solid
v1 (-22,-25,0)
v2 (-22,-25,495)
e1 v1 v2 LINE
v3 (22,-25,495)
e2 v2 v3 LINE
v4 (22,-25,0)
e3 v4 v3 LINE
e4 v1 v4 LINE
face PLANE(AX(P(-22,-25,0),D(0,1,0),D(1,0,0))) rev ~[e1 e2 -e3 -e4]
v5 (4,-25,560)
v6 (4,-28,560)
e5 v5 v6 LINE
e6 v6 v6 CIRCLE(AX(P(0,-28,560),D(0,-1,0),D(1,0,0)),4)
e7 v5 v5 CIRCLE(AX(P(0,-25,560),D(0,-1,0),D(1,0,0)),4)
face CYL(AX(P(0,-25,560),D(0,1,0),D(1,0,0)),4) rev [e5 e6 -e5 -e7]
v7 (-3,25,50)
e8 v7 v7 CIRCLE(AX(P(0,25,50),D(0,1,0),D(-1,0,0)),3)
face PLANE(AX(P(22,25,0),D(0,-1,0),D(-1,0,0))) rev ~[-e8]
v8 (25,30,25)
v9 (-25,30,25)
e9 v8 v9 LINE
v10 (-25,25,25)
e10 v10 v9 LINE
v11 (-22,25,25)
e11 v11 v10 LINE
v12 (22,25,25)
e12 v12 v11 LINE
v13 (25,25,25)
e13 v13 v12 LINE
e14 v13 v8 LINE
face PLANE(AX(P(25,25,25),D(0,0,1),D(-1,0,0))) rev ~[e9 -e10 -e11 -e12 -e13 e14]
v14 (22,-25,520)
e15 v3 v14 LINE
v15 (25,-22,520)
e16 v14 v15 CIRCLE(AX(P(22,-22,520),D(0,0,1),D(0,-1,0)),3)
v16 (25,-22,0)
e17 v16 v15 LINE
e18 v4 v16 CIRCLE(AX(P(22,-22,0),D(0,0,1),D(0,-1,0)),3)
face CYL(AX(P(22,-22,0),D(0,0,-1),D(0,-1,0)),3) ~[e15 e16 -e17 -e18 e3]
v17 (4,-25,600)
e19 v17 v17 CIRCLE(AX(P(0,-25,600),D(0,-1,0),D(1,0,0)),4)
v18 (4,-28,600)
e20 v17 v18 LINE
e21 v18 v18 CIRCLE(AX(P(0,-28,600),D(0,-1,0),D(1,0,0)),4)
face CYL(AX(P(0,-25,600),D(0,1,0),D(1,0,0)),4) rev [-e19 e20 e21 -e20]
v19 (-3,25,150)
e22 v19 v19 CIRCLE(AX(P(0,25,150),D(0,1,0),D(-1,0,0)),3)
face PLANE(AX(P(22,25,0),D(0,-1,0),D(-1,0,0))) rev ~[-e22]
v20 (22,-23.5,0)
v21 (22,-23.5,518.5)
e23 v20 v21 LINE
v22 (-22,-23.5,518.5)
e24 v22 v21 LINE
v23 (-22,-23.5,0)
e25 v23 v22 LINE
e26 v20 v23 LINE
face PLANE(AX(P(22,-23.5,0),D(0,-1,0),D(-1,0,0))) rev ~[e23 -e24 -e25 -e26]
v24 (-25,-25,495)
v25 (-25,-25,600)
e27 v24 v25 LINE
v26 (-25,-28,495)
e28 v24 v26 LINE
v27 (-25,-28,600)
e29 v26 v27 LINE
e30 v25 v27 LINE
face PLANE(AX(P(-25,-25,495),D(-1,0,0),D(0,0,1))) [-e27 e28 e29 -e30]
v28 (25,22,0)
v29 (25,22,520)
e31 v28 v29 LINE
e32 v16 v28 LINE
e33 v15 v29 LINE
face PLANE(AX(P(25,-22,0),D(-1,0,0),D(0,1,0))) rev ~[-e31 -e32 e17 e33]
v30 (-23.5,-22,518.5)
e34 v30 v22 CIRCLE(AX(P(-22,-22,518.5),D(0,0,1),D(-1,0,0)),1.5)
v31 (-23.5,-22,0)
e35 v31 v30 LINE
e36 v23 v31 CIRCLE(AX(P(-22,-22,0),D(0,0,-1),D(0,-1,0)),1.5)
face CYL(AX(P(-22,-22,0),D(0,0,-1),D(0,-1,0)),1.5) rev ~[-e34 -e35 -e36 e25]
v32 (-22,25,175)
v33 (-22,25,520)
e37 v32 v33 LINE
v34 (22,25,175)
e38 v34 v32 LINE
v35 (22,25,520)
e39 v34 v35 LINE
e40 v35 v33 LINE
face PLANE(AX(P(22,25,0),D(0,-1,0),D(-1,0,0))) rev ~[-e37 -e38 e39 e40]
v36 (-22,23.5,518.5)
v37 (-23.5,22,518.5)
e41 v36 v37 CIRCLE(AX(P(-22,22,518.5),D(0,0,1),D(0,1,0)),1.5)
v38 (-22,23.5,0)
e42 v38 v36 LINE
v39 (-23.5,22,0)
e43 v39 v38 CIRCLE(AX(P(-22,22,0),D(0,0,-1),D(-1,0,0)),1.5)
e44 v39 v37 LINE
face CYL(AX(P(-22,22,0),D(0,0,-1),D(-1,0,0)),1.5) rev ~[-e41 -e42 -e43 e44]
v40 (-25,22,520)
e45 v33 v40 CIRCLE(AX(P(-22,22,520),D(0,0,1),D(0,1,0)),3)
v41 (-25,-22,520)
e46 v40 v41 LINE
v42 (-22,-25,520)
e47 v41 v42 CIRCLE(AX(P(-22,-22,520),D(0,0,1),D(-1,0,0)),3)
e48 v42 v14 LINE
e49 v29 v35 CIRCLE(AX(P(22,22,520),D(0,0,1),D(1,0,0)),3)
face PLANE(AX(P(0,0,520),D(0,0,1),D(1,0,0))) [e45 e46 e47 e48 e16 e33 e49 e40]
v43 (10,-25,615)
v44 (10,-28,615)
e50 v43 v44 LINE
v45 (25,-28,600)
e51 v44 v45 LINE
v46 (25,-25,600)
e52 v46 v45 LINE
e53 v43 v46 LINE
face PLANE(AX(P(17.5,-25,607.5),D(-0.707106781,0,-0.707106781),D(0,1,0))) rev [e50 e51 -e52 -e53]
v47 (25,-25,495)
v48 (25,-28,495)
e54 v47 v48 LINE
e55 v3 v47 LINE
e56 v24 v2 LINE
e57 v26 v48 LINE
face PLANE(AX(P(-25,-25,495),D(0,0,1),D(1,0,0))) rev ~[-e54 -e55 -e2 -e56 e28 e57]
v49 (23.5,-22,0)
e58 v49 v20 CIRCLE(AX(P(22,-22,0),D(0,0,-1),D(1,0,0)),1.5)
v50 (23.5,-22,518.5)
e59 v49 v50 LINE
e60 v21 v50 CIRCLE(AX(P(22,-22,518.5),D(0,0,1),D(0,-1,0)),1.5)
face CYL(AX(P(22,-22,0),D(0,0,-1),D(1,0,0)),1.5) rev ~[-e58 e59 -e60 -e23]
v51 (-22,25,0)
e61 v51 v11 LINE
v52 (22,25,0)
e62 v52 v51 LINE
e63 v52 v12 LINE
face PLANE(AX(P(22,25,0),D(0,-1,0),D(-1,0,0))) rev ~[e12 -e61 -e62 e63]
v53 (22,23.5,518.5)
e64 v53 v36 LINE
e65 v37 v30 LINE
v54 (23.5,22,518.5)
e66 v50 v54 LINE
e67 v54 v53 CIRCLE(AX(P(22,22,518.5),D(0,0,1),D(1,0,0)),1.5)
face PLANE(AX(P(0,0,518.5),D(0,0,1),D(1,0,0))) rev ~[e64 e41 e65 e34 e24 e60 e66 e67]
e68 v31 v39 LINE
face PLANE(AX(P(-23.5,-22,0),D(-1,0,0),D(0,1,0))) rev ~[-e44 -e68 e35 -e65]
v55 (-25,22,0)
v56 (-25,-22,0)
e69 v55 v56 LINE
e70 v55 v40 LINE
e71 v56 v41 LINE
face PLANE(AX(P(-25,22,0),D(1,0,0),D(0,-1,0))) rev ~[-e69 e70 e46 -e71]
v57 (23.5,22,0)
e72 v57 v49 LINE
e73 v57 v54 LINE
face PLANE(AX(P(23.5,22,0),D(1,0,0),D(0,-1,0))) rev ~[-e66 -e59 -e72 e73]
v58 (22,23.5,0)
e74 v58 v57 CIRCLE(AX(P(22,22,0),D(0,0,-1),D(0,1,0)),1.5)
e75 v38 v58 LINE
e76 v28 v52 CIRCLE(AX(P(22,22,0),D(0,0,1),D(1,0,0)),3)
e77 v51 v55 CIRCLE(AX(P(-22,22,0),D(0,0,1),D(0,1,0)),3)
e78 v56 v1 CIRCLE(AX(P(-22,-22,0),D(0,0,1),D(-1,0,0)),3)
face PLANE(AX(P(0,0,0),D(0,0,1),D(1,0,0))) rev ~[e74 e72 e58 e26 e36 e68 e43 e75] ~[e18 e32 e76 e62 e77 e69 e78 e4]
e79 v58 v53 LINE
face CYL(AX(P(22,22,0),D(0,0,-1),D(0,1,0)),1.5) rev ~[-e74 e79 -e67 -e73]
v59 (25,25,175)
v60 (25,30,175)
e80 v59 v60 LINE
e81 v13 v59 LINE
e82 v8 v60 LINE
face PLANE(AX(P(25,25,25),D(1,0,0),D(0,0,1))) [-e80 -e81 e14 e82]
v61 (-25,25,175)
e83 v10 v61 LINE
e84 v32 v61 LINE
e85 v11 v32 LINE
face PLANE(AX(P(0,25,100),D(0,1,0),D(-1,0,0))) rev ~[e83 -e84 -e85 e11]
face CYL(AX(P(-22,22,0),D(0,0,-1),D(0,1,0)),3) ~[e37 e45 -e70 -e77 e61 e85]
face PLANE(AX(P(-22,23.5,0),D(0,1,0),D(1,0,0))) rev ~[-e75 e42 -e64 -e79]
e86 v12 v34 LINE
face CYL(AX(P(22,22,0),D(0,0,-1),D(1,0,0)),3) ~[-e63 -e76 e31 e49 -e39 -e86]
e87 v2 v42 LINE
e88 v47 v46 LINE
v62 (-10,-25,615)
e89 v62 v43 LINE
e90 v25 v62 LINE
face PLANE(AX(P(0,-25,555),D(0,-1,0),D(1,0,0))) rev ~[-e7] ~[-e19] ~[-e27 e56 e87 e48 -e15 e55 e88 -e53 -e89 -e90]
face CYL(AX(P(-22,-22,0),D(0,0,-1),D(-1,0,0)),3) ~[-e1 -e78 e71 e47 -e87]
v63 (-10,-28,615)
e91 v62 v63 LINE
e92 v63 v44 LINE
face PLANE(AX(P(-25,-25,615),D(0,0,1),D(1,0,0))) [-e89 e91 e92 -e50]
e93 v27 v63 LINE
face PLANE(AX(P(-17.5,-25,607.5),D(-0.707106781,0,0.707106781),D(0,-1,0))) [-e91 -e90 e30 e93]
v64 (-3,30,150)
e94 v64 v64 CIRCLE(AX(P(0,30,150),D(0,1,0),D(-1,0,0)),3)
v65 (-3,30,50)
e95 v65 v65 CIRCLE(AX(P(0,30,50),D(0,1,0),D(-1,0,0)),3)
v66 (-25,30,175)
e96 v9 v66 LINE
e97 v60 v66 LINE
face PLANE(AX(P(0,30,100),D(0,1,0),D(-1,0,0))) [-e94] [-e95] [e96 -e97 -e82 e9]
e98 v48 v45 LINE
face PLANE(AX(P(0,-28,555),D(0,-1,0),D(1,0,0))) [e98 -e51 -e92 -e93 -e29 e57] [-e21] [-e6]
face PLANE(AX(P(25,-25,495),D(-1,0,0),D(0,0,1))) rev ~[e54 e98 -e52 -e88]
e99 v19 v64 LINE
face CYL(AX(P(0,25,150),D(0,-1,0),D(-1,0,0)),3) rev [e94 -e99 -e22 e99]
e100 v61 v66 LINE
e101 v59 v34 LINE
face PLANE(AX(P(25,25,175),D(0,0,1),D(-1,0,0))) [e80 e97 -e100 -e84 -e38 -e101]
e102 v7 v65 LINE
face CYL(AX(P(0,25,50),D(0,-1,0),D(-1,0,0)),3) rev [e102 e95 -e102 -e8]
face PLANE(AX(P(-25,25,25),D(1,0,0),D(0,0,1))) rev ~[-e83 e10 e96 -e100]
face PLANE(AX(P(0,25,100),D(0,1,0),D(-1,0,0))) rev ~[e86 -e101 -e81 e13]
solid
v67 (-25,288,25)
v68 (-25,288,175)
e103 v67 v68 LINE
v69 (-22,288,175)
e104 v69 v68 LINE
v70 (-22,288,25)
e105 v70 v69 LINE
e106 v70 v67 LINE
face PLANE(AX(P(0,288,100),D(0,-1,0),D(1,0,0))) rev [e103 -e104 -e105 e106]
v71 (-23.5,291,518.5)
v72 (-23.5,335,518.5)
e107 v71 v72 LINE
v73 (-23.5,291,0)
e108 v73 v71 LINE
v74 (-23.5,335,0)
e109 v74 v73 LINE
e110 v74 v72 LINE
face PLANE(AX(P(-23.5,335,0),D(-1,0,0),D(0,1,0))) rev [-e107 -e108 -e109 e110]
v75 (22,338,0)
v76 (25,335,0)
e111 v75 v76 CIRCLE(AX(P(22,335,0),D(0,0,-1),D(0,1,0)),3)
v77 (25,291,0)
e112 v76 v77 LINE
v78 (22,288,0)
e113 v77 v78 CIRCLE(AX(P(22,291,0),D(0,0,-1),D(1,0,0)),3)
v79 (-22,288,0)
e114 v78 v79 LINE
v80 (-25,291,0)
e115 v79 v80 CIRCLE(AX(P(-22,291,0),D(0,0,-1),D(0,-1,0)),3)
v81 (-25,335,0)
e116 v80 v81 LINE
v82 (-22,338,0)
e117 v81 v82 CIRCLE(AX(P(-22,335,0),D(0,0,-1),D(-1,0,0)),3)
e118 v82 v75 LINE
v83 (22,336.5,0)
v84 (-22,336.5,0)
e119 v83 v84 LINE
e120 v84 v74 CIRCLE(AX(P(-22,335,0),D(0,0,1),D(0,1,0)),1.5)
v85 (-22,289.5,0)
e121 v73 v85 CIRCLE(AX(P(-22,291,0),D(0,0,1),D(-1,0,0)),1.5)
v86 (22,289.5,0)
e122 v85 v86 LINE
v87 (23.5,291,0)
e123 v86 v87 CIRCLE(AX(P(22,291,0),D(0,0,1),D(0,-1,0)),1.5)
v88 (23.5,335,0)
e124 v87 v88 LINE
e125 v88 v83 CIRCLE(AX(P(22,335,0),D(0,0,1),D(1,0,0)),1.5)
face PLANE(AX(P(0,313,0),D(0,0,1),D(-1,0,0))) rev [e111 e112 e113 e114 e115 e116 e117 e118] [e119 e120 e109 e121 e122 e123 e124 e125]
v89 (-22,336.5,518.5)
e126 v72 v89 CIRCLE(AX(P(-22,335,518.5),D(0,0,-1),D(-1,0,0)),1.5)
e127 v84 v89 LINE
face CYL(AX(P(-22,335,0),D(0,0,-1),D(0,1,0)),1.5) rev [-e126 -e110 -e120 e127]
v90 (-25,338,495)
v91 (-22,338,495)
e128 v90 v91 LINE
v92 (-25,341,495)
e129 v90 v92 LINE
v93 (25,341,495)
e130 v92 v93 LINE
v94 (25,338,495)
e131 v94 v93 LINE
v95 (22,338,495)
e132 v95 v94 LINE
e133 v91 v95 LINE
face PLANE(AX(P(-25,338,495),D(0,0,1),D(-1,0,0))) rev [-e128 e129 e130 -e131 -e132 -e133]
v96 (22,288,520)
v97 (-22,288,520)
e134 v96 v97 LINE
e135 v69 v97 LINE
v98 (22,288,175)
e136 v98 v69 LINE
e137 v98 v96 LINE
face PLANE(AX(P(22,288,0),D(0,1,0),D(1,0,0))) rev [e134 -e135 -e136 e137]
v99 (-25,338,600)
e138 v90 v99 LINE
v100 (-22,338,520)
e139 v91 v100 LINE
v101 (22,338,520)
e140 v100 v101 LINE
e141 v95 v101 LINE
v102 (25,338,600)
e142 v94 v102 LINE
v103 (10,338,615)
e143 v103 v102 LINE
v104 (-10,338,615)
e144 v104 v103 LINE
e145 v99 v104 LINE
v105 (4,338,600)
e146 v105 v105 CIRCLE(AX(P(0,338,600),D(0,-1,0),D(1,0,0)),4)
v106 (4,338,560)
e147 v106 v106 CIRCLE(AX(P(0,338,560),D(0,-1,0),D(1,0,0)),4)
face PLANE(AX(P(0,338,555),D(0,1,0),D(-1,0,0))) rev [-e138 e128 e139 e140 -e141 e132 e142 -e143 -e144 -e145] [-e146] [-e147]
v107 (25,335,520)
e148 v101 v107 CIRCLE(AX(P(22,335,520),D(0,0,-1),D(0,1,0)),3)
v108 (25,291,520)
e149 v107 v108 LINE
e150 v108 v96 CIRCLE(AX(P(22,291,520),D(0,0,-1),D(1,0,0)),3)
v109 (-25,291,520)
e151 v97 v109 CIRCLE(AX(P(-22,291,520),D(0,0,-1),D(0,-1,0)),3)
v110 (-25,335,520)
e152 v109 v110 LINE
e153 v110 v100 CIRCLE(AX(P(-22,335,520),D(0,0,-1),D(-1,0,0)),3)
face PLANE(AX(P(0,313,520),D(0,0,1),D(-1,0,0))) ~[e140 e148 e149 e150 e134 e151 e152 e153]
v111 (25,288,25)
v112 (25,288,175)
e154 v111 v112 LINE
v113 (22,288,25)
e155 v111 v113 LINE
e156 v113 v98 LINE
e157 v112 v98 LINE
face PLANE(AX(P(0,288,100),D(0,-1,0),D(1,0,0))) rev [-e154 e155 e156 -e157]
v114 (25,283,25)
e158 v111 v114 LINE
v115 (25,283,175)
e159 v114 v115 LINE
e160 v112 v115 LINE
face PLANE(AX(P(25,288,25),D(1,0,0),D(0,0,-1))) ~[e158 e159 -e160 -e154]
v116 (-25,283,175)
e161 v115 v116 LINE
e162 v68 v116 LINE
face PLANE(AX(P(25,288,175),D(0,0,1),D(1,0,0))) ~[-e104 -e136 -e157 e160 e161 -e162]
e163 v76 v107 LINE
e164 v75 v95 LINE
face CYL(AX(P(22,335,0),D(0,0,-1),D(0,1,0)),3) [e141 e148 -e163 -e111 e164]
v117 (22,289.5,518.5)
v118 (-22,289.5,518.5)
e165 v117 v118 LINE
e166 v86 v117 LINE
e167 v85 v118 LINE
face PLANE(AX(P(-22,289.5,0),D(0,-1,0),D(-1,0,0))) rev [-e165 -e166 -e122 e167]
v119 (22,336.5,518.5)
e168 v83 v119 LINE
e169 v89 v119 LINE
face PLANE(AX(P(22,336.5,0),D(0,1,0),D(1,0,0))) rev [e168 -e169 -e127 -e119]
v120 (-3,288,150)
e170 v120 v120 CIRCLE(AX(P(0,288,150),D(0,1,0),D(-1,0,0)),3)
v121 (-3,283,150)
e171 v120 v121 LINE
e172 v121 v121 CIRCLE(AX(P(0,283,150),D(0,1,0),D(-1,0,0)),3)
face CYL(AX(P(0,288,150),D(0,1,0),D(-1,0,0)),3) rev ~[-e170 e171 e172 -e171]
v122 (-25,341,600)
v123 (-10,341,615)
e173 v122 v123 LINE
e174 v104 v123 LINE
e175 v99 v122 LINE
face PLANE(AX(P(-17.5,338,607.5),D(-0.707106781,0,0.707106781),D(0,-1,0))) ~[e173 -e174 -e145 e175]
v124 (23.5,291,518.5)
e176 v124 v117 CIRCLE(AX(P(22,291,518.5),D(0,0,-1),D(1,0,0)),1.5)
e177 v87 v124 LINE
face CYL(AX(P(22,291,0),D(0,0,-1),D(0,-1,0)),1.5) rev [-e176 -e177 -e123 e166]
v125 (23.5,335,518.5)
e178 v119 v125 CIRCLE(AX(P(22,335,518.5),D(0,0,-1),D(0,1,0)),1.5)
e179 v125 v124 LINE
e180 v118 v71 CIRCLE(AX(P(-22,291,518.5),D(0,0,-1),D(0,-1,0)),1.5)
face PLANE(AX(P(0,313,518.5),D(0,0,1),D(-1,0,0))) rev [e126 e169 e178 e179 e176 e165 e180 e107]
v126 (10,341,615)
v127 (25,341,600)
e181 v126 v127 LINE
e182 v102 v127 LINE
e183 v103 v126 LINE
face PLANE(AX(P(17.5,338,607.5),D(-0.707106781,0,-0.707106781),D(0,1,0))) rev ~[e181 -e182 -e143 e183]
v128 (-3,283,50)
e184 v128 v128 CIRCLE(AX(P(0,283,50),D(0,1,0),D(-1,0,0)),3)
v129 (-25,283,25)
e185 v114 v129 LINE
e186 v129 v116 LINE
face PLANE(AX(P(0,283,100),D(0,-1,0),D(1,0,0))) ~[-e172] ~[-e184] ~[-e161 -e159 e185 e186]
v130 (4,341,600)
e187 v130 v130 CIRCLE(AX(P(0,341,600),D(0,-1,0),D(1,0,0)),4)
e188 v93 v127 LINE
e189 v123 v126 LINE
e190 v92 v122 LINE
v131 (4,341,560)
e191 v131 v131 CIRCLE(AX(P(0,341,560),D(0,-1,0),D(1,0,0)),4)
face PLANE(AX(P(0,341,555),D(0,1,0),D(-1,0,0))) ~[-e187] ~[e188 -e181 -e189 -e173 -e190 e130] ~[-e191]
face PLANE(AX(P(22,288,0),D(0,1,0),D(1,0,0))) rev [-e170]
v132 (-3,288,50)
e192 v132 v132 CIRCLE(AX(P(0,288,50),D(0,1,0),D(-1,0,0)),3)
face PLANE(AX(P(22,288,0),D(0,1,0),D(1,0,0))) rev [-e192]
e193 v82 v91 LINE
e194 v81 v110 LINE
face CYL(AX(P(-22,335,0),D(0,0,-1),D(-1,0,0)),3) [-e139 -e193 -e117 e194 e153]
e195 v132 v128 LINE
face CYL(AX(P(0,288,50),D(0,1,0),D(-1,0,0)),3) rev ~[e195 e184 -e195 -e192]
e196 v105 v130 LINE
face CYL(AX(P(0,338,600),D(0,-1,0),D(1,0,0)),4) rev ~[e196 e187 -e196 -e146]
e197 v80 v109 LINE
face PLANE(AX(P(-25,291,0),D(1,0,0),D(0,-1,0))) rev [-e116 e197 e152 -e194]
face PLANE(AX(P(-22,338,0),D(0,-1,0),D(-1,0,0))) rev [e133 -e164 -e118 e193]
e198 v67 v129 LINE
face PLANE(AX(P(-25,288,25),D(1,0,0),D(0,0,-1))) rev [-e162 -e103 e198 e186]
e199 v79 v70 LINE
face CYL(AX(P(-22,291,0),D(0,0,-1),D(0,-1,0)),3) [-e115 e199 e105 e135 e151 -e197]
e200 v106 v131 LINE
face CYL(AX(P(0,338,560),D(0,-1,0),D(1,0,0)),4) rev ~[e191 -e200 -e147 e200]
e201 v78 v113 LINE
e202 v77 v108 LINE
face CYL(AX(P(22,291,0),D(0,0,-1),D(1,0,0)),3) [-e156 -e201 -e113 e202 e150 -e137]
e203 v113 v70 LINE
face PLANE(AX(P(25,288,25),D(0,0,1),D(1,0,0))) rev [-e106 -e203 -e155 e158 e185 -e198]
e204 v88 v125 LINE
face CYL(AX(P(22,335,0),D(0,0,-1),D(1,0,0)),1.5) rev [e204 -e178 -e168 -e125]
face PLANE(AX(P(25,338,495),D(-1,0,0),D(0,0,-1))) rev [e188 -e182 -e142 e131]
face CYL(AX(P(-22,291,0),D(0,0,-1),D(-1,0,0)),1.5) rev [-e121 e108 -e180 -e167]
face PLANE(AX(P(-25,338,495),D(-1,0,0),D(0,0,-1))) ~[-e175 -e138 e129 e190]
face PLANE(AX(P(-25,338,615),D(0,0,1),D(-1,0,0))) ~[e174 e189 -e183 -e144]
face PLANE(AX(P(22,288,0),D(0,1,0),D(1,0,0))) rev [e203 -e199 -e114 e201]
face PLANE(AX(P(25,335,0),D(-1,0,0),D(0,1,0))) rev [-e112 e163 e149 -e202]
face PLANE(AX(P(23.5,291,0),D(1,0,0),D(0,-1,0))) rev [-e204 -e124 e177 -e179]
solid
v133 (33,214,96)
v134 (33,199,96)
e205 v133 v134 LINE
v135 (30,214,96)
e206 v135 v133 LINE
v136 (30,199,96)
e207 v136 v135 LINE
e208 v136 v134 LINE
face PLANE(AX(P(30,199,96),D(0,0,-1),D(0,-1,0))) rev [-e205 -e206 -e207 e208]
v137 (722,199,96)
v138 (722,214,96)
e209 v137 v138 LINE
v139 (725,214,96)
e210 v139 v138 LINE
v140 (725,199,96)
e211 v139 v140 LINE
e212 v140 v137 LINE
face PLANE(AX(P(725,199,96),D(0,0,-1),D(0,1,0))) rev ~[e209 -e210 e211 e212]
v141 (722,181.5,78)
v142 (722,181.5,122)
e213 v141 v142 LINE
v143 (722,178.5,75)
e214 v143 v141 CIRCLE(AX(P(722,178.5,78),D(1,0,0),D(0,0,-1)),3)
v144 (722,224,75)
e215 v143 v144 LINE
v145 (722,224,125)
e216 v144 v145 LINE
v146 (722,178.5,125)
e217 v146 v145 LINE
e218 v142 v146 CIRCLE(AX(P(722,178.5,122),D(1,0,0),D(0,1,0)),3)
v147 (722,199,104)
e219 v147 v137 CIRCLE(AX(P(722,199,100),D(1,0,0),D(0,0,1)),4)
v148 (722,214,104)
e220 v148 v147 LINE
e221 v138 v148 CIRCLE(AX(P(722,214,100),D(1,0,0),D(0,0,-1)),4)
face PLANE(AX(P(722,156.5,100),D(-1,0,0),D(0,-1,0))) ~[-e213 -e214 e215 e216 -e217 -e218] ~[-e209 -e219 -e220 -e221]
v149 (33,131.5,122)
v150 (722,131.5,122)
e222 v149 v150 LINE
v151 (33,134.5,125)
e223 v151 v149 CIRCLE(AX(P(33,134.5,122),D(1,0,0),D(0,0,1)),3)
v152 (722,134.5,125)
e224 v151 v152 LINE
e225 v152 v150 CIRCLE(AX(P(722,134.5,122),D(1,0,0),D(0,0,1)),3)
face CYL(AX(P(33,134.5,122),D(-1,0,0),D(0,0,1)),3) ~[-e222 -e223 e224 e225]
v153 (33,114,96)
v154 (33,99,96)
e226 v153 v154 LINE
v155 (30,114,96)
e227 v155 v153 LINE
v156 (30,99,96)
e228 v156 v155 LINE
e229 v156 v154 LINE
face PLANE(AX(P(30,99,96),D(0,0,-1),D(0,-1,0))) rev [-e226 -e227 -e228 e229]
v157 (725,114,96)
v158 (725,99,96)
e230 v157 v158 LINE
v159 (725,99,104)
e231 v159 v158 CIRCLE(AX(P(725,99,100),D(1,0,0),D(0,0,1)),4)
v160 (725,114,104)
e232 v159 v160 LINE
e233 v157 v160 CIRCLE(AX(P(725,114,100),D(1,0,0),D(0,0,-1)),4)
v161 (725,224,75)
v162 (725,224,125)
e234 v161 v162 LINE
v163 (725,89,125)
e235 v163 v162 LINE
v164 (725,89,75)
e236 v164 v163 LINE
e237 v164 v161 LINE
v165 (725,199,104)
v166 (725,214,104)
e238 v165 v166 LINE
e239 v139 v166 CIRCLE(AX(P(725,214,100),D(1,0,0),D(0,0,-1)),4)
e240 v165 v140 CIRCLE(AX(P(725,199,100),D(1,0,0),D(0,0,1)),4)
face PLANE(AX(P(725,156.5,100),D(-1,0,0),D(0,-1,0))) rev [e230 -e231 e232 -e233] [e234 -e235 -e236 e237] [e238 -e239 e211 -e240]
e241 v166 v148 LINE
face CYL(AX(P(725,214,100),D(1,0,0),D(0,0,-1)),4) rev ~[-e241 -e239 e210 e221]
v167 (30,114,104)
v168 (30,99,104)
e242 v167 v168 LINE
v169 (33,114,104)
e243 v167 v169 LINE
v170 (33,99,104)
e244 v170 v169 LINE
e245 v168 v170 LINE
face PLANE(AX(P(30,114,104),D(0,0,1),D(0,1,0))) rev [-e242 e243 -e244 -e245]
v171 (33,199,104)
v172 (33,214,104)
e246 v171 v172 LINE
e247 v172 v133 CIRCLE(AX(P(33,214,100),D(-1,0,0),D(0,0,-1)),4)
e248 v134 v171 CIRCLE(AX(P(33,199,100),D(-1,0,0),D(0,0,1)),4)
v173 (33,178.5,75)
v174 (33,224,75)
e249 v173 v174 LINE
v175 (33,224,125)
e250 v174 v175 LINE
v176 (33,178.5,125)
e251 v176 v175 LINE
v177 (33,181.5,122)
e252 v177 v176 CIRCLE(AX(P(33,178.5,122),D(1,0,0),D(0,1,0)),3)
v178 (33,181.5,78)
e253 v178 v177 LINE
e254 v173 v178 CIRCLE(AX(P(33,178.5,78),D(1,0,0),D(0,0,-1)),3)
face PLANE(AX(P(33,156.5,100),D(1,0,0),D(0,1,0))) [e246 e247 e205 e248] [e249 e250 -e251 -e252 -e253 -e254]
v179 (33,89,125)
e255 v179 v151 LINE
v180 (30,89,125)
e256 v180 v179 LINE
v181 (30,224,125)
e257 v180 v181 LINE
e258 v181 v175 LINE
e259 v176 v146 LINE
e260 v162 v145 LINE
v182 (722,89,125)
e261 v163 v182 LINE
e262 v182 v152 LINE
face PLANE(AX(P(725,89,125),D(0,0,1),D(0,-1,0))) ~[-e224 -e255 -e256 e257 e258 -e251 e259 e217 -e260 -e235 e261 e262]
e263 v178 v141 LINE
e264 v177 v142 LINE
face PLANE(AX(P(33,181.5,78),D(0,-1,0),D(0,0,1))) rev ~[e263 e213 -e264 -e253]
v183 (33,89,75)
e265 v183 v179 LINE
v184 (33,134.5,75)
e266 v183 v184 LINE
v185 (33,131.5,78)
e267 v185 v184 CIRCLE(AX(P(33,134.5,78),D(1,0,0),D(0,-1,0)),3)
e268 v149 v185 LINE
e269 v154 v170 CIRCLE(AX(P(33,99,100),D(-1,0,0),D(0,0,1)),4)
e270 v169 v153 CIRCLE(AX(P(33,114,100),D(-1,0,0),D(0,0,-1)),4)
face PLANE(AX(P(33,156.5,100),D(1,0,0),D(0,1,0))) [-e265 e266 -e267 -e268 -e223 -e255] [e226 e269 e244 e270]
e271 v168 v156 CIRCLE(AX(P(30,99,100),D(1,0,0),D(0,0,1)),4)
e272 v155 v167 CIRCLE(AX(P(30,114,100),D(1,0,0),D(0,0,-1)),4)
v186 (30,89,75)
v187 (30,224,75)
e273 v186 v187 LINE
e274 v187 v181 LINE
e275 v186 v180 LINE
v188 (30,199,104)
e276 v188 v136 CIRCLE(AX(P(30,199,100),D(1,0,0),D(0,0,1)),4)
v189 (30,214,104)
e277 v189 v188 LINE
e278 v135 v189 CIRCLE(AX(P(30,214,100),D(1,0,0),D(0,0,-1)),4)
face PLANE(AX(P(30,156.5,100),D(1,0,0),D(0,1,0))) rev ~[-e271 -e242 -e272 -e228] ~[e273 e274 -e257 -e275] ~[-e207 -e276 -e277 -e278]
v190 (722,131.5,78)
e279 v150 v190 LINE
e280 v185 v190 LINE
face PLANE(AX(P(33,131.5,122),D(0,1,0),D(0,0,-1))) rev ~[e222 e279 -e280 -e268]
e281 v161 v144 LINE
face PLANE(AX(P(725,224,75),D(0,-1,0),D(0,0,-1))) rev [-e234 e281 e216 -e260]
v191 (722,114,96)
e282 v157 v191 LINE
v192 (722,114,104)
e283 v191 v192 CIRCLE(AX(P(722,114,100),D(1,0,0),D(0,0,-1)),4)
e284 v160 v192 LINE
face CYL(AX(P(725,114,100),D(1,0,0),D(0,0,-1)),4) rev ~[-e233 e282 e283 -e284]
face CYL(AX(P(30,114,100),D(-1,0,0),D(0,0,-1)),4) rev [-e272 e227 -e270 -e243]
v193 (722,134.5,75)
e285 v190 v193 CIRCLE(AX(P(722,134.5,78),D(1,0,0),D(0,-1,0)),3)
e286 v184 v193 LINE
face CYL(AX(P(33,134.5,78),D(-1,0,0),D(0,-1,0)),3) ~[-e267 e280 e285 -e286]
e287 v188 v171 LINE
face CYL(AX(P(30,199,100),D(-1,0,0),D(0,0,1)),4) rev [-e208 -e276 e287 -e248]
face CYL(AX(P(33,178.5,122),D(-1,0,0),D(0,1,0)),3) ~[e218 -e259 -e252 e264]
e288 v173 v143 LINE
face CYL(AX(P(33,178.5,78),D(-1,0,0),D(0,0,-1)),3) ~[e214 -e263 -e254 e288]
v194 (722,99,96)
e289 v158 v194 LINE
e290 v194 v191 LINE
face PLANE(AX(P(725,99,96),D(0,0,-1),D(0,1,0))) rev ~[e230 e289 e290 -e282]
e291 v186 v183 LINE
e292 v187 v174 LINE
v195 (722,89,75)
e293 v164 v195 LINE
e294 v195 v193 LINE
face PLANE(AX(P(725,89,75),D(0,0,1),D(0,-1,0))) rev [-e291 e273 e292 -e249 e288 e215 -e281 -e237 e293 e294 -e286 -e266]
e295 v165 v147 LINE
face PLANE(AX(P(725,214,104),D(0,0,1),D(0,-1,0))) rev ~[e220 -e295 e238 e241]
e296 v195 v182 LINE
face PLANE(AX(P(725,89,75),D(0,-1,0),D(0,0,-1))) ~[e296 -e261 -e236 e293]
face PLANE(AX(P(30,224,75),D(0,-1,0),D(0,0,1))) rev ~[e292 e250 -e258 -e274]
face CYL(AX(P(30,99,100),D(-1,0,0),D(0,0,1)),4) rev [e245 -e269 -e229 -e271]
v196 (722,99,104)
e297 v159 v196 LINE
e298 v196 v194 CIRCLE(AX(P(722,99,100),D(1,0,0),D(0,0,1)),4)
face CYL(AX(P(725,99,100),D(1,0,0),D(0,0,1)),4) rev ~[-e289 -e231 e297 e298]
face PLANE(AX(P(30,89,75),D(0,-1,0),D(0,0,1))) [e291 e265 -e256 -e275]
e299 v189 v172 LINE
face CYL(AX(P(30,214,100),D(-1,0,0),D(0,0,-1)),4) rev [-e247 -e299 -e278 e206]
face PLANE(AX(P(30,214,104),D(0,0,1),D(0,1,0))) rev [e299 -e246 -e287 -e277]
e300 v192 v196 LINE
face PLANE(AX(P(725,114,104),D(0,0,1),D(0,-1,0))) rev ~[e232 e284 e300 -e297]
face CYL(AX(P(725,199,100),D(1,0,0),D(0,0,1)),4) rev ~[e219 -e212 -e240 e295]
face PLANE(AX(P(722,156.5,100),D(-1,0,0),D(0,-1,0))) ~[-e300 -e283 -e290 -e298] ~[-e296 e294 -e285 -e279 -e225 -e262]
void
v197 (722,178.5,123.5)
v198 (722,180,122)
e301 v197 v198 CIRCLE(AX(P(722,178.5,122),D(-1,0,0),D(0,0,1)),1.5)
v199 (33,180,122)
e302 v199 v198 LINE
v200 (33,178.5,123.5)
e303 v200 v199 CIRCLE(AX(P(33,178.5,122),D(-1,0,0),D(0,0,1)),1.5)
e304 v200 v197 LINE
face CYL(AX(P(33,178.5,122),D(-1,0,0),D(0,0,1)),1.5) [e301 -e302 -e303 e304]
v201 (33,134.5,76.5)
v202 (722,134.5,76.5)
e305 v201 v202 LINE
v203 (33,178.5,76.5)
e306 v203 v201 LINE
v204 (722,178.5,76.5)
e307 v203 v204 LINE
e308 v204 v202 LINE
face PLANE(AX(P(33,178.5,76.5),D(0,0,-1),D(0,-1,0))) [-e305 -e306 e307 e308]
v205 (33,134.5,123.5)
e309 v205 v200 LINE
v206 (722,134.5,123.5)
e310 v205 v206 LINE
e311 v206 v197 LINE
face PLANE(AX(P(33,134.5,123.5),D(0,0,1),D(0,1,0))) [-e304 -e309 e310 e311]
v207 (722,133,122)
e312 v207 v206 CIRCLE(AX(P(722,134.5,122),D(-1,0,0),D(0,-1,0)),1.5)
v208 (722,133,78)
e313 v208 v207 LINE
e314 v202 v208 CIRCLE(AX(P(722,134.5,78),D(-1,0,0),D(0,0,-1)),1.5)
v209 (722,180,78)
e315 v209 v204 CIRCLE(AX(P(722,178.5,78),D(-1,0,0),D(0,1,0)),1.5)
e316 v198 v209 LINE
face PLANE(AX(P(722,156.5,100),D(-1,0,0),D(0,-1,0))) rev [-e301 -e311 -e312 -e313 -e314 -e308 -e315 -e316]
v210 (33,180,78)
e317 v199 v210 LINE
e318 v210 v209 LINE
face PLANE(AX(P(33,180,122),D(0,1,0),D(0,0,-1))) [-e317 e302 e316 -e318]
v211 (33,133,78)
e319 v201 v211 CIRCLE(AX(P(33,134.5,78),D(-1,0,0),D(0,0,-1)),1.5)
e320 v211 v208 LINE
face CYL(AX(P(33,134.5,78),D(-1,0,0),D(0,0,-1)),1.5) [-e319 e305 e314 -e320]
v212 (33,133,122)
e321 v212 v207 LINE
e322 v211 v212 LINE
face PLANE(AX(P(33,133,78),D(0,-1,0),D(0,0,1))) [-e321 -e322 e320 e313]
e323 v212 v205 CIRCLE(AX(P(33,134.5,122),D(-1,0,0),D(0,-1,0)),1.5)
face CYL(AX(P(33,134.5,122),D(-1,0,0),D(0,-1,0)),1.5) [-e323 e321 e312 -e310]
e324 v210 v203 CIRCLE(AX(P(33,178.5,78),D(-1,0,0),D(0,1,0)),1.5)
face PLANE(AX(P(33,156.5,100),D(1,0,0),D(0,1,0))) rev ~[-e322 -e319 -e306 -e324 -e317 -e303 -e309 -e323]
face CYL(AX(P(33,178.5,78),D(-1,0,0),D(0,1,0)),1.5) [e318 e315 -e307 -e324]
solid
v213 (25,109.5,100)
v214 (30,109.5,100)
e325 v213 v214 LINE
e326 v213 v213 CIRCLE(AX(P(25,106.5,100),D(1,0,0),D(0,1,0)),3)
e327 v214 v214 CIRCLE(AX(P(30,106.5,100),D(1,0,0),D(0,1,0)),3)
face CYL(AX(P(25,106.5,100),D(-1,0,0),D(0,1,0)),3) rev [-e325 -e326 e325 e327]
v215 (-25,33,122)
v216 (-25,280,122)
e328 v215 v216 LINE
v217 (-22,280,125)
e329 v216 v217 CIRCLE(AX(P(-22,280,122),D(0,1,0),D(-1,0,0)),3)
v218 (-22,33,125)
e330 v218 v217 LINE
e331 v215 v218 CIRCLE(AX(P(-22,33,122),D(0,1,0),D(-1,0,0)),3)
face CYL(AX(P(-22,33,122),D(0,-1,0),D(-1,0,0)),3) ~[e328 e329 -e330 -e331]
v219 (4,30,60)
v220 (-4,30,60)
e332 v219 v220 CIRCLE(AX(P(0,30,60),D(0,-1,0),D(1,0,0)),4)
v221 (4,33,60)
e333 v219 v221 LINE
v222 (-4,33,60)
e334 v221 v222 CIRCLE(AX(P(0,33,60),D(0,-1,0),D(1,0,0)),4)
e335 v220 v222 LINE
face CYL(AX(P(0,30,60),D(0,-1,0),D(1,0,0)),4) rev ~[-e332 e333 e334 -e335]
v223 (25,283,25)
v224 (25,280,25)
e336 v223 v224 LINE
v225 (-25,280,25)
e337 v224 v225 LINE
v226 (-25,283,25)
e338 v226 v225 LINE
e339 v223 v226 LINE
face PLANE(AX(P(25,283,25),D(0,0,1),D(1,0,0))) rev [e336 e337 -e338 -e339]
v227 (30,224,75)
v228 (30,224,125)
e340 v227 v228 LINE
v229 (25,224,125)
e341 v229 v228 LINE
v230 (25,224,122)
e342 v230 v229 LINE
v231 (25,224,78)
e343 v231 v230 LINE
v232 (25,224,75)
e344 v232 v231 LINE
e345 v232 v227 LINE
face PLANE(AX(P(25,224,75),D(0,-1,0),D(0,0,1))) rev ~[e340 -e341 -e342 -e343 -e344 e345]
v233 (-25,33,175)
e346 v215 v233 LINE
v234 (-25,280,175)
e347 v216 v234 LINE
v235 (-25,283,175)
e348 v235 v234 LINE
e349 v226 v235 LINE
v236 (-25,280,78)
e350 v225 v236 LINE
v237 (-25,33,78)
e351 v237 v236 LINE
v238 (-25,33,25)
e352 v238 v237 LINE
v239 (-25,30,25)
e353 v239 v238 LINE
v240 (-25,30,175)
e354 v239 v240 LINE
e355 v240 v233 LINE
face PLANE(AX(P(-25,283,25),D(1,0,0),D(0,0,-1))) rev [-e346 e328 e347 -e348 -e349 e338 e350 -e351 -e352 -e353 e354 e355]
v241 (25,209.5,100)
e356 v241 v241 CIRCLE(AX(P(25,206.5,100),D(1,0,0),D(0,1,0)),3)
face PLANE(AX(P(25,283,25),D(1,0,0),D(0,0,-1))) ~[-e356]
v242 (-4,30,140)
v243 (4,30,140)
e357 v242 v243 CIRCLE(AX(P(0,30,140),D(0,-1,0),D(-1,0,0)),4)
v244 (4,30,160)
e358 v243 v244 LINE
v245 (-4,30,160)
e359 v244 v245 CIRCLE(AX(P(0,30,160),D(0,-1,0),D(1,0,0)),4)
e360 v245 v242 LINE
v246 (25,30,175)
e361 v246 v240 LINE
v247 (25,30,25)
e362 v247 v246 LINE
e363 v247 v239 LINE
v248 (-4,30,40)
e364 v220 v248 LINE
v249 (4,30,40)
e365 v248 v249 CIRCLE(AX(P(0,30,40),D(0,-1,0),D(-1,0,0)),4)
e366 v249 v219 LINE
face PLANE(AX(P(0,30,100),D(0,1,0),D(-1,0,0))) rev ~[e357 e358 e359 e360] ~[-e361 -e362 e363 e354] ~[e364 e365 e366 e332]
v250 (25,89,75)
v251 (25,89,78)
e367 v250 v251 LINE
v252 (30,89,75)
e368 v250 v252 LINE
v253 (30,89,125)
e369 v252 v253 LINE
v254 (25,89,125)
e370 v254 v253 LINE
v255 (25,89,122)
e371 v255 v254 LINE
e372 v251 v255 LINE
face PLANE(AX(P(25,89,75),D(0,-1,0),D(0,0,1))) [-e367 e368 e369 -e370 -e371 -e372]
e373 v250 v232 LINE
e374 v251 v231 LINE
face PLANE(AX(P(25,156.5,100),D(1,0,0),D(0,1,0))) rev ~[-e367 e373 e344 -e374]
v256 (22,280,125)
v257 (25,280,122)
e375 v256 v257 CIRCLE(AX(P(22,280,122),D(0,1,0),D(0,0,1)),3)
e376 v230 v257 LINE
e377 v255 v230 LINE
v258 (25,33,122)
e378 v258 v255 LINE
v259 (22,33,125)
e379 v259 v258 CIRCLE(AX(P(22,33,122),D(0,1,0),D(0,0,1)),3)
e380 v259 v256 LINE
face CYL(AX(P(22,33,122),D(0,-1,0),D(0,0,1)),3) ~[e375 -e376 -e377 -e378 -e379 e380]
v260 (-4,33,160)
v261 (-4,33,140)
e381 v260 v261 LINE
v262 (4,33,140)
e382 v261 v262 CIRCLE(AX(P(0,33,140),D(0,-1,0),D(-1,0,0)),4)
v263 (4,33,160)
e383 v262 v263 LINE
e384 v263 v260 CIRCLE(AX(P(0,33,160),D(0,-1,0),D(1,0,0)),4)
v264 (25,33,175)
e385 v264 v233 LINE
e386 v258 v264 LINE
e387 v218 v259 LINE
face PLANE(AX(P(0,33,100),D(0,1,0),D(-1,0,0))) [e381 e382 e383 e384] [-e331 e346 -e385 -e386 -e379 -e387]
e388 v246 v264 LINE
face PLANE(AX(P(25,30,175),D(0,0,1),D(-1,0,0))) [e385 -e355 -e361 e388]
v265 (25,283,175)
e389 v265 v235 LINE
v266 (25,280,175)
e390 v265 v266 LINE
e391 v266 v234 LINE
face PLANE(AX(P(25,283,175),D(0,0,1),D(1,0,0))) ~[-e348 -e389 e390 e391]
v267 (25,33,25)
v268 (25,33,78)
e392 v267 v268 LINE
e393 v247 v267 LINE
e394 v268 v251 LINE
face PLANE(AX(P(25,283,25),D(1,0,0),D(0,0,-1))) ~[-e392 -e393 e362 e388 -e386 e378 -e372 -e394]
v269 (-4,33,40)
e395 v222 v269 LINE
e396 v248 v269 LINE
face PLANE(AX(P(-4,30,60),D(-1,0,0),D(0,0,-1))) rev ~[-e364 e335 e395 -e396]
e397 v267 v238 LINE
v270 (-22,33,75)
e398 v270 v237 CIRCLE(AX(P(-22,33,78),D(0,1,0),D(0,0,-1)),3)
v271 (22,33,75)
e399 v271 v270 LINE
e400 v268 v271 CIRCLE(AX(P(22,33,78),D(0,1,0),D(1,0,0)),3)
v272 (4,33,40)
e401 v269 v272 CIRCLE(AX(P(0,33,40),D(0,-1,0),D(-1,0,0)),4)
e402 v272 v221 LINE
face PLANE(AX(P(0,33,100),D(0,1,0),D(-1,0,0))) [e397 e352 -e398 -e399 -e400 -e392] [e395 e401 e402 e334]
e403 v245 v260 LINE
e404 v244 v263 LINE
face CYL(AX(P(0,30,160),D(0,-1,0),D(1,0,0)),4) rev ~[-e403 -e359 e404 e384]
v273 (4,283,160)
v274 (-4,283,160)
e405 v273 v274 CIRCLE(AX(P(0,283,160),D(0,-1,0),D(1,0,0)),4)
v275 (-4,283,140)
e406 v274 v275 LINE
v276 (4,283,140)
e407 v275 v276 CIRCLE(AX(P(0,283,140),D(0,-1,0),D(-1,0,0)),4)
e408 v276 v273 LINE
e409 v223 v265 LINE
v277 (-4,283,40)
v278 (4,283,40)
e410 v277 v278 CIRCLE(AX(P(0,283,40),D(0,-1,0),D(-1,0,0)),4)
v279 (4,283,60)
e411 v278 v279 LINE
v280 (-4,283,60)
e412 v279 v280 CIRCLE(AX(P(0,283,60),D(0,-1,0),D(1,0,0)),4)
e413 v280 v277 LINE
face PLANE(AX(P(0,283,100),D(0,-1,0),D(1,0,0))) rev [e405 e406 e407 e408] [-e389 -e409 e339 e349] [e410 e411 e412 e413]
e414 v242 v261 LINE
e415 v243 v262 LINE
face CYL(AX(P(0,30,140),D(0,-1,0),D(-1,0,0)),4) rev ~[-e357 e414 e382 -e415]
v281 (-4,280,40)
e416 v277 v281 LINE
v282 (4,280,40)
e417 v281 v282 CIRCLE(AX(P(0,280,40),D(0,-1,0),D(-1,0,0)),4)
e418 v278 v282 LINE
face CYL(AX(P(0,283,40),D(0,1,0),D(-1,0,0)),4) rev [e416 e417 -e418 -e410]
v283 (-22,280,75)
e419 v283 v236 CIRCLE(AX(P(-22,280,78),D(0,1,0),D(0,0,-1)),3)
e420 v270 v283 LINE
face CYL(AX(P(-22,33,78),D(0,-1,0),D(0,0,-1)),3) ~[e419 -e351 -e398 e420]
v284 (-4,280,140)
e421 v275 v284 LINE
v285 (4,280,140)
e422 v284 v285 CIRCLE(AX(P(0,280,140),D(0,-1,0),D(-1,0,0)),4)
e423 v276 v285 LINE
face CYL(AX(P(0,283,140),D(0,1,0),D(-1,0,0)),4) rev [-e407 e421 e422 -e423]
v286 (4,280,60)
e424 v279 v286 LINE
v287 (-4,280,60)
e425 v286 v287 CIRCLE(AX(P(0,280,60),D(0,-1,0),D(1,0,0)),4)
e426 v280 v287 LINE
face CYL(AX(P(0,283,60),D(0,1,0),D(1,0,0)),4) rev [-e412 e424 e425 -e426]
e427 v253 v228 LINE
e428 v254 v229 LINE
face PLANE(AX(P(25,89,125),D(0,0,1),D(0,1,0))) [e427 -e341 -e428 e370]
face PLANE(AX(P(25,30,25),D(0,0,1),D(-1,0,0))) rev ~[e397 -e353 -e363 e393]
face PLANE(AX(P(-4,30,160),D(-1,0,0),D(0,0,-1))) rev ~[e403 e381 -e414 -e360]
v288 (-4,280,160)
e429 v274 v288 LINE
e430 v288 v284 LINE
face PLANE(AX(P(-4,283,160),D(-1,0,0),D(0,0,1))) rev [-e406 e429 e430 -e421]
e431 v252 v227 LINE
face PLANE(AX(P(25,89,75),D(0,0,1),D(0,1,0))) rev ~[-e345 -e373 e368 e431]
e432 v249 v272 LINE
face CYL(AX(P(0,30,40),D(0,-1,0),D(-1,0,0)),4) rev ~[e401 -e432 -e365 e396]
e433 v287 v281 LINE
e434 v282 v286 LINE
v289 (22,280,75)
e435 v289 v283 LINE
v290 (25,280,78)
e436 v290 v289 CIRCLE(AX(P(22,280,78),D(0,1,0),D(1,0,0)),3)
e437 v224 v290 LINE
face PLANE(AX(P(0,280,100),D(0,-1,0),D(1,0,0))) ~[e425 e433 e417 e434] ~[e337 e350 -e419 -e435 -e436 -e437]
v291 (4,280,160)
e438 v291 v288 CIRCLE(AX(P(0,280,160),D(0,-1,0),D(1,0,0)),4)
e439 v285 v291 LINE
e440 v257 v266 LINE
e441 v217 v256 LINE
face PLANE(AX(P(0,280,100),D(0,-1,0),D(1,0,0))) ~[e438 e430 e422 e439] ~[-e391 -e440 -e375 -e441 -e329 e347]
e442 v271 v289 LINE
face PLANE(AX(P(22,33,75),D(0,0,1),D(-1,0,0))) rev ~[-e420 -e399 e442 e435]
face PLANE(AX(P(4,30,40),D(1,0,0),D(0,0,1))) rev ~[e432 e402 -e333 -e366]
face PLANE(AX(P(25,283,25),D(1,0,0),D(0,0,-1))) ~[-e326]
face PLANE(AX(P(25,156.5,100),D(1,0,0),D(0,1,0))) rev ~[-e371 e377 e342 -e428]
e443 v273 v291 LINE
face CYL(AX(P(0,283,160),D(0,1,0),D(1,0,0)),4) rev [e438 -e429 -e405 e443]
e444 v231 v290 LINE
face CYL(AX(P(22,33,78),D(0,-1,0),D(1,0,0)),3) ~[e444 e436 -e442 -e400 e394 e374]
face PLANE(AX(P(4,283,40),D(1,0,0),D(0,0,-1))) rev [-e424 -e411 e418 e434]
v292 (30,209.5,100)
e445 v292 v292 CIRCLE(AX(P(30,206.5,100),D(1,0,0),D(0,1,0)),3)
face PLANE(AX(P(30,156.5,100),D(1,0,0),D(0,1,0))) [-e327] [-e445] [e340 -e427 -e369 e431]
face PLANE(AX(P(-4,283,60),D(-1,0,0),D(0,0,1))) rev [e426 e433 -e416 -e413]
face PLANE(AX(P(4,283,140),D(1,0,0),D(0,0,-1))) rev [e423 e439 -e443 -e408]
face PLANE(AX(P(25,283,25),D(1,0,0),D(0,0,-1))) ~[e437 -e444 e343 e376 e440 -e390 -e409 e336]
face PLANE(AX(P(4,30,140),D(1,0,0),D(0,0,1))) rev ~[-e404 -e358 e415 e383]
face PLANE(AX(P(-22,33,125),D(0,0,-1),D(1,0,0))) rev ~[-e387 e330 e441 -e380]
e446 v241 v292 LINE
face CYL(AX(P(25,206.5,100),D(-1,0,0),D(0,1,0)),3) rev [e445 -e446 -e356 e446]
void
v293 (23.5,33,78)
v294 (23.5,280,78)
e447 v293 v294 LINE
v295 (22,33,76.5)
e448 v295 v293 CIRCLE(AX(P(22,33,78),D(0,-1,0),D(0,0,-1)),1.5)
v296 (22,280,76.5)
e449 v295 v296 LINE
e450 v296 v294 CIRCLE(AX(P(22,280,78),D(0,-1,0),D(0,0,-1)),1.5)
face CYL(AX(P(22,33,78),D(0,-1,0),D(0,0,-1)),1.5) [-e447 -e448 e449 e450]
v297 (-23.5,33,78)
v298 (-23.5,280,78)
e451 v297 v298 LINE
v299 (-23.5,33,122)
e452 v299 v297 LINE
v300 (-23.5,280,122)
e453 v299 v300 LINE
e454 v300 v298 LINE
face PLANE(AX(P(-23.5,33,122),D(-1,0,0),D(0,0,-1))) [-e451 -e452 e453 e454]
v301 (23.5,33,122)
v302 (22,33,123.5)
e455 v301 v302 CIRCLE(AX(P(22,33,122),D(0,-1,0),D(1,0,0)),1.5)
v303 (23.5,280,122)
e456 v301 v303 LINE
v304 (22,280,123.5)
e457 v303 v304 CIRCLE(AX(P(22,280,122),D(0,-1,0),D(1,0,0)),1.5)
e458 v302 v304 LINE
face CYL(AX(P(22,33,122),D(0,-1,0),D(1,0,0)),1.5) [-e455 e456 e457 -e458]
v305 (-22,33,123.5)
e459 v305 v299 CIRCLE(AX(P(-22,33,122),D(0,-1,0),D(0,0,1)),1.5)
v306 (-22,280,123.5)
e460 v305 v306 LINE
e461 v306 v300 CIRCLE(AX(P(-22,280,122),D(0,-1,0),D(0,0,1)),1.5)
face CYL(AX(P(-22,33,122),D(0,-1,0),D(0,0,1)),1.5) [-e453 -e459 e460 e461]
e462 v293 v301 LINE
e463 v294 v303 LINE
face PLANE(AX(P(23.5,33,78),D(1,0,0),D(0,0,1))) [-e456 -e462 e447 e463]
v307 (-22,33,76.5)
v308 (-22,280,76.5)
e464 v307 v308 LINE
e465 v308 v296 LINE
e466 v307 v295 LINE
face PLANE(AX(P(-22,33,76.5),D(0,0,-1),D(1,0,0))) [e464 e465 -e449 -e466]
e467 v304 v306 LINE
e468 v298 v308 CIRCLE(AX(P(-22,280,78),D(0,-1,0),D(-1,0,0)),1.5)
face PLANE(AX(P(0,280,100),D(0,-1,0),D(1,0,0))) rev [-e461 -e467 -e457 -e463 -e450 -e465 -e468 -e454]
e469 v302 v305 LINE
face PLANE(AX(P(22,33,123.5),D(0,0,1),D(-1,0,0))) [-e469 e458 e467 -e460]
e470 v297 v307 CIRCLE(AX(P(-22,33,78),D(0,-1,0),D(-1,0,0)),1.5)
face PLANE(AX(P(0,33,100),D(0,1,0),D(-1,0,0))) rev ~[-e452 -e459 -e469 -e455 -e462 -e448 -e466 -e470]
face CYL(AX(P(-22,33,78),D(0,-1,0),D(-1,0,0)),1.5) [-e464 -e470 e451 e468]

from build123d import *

# Parameters (mm, degrees)
F1_DEPTH  = 520
F2_W      = 50
F2_H      = 150
F2_R      = 3
F3_DEPTH  = 5
F5_DEPTH  = 1.5
F6_W      = 50
F6_H      = 120
F6_R      = 4
F7_DEPTH  = 3
F8_SIZE   = 15
F11_W     = 50
F11_H     = 150
F12_DEPTH = 3
F15_DEPTH = 247
F17_W     = 135
F17_H     = 50
F17_R     = 3
F18_DEPTH = 5
F19_W     = 135
F19_H     = 50
F19_R     = 4
F20_DEPTH = 3
F23_DEPTH = 689
F25_DEPTH = 3.001


# Not quite as in the source:
# - a pattern or mirror of a feature is missing from the dataset's text; its kind, count and spacing are read off the source's solid


with BuildPart() as f1:
    # F0 (on Top) → F1 (new body)
    with BuildSketch(Plane.XY):
        with BuildLine():
            Line((-22, -25), (22, -25))
            ThreePointArc((22, -25), (24.1213203436, -24.1213203436), (25, -22))
            Line((25, -22), (25, 22))
            ThreePointArc((25, 22), (24.1213203436, 24.1213203436), (22, 25))
            Line((22, 25), (-22, 25))
            ThreePointArc((-22, 25), (-24.1213203436, 24.1213203436), (-25, 22))
            Line((-25, 22), (-25, -22))
            ThreePointArc((-25, -22), (-24.1213203436, -24.1213203436), (-22, -25))
        make_face()
        with BuildLine():
            ThreePointArc((22, 23.5), (23.0606601718, 23.0606601718), (23.5, 22))
            Line((23.5, 22), (23.5, -22))
            ThreePointArc((23.5, -22), (23.0606601718, -23.0606601718), (22, -23.5))
            Line((22, -23.5), (-22, -23.5))
            ThreePointArc((-22, -23.5), (-23.0606601718, -23.0606601718), (-23.5, -22))
            Line((-23.5, -22), (-23.5, 22))
            ThreePointArc((-23.5, 22), (-23.0606601718, 23.0606601718), (-22, 23.5))
            Line((-22, 23.5), (22, 23.5))
        make_face(mode=Mode.SUBTRACT)
    extrude(amount=F1_DEPTH)

    # F2 (on face) → F3 (join)
    with BuildSketch(Plane(origin=(0, 25, 0), x_dir=(-1, 0, 0), z_dir=(0, 1, 0))):
        with Locations((0, 100)):
            Rectangle(F2_W, F2_H)
        with Locations((0, 50)):
            Circle(F2_R, mode=Mode.SUBTRACT)
        with Locations((0, 150)):
            Circle(F2_R, mode=Mode.SUBTRACT)
    extrude(amount=F3_DEPTH)

    # F4 (on face) → F5 (join)
    with BuildSketch(Plane.XY.offset(520)):
        with BuildLine():
            ThreePointArc((23.5, 22), (23.0606601718, 23.0606601718), (22, 23.5))
            Line((22, 23.5), (-22, 23.5))
            ThreePointArc((-22, 23.5), (-23.0606601718, 23.0606601718), (-23.5, 22))
            Line((-23.5, 22), (-23.5, -22))
            ThreePointArc((-23.5, -22), (-23.0606601718, -23.0606601718), (-22, -23.5))
            Line((-22, -23.5), (22, -23.5))
            ThreePointArc((22, -23.5), (23.0606601718, -23.0606601718), (23.5, -22))
            Line((23.5, -22), (23.5, 22))
        make_face()
    extrude(amount=-F5_DEPTH)

    # F6 (on face) → F7 (join)
    with BuildSketch(Plane.XZ.offset(25)):
        with Locations((0, 555)):
            Rectangle(F6_W, F6_H)
        with Locations((0, 560)):
            Circle(F6_R, mode=Mode.SUBTRACT)
        with Locations((0, 600)):
            Circle(F6_R, mode=Mode.SUBTRACT)
    extrude(amount=F7_DEPTH)

    # F8
    f8_edges = [f1.edges().sort_by_distance(p)[0] for p in [
        (25, -26.5, 615),
        (-25, -26.5, 615),
    ]]
    chamfer(f8_edges, length=F8_SIZE)


with BuildPart() as f10_1:
    # F10: instance of F1
    add(f1.part.mirror(Plane(origin=(0, 156.5, 563.1674453561), x_dir=(1, 0, 0), z_dir=(0, 1, 0))))


with BuildPart() as f12:
    # F11 (on face) → F12 (new body)
    with BuildSketch(Plane(origin=(0, 30, 0), x_dir=(-1, 0, 0), z_dir=(0, 1, 0))):
        with Locations((0, 100)):
            Rectangle(F11_W, F11_H)
        with BuildLine():
            Line((-4, 40), (-4, 60))
            ThreePointArc((-4, 60), (0, 64), (4, 60))
            Line((4, 60), (4, 40))
            ThreePointArc((4, 40), (0, 36), (-4, 40))
        make_face(mode=Mode.SUBTRACT)
        with BuildLine():
            Line((4, 160), (4, 140))
            ThreePointArc((4, 140), (0, 136), (-4, 140))
            Line((-4, 140), (-4, 160))
            ThreePointArc((-4, 160), (0, 164), (4, 160))
        make_face(mode=Mode.SUBTRACT)
    extrude(amount=F12_DEPTH)


with BuildPart() as f13_1:
    # F13: instance of F12
    add(f12.part.mirror(Plane(origin=(0, 156.5, 563.1674453561), x_dir=(1, 0, 0), z_dir=(0, 1, 0))))


with BuildPart() as f12_1:
    add(f12.part)

    add(f13_1.part)  # F15 merges F13_1
    # F14 (on face) → F15 (join, through all)
    with BuildSketch(Plane(origin=(0, 33, 0), x_dir=(-1, 0, 0), z_dir=(0, 1, 0))):
        with BuildLine():
            Line((-22, 75), (22, 75))
            ThreePointArc((22, 75), (24.1213203436, 75.8786796564), (25, 78))
            Line((25, 78), (25, 122))
            ThreePointArc((25, 122), (24.1213203436, 124.1213203436), (22, 125))
            Line((22, 125), (-22, 125))
            ThreePointArc((-22, 125), (-24.1213203436, 124.1213203436), (-25, 122))
            Line((-25, 122), (-25, 78))
            ThreePointArc((-25, 78), (-24.1213203436, 75.8786796564), (-22, 75))
        make_face()
        with BuildLine():
            ThreePointArc((22, 123.5), (23.0606601718, 123.0606601718), (23.5, 122))
            Line((23.5, 122), (23.5, 78))
            ThreePointArc((23.5, 78), (23.0606601718, 76.9393398282), (22, 76.5))
            Line((22, 76.5), (-22, 76.5))
            ThreePointArc((-22, 76.5), (-23.0606601718, 76.9393398282), (-23.5, 78))
            Line((-23.5, 78), (-23.5, 122))
            ThreePointArc((-23.5, 122), (-23.0606601718, 123.0606601718), (-22, 123.5))
            Line((-22, 123.5), (22, 123.5))
        make_face(mode=Mode.SUBTRACT)
    extrude(amount=F15_DEPTH)

    # F17 (on face) → F18 (join)
    with BuildSketch(Plane.YZ.offset(25)):
        with Locations((156.5, 100)):
            Rectangle(F17_W, F17_H)
        with Locations((106.5, 100)):
            Circle(F17_R, mode=Mode.SUBTRACT)
        with Locations((206.5, 100)):
            Circle(F17_R, mode=Mode.SUBTRACT)
    extrude(amount=F18_DEPTH)


with BuildPart() as f20:
    # F19 (on face) → F20 (new body)
    with BuildSketch(Plane.YZ.offset(30)):
        with Locations((156.5, 100)):
            Rectangle(F19_W, F19_H)
        with Locations((106.5, 100)):
            Circle(F19_R, mode=Mode.SUBTRACT)
        with Locations((206.5, 100)):
            Circle(F19_R, mode=Mode.SUBTRACT)
    extrude(amount=F20_DEPTH)


with BuildPart() as f21_1:
    # F21: instance of F20
    add(f20.part.mirror(Plane(origin=(377.5, 0, 260), x_dir=(0, 1, 0), z_dir=(1, 0, 0))))


with BuildPart() as f20_1:
    add(f20.part)

    add(f21_1.part)  # F23 merges F21_1
    # F22 (on face) → F23 (join, through all)
    with BuildSketch(Plane.YZ.offset(33)):
        with BuildLine():
            Line((134.5, 75), (178.5, 75))
            ThreePointArc((178.5, 75), (180.6213203436, 75.8786796564), (181.5, 78))
            Line((181.5, 78), (181.5, 122))
            ThreePointArc((181.5, 122), (180.6213203436, 124.1213203436), (178.5, 125))
            Line((178.5, 125), (134.5, 125))
            ThreePointArc((134.5, 125), (132.3786796564, 124.1213203436), (131.5, 122))
            Line((131.5, 122), (131.5, 78))
            ThreePointArc((131.5, 78), (132.3786796564, 75.8786796564), (134.5, 75))
        make_face()
        with BuildLine():
            ThreePointArc((178.5, 123.5), (179.5606601718, 123.0606601718), (180, 122))
            Line((180, 122), (180, 78))
            ThreePointArc((180, 78), (179.5606601718, 76.9393398282), (178.5, 76.5))
            Line((178.5, 76.5), (134.5, 76.5))
            ThreePointArc((134.5, 76.5), (133.4393398282, 76.9393398282), (133, 78))
            Line((133, 78), (133, 122))
            ThreePointArc((133, 122), (133.4393398282, 123.0606601718), (134.5, 123.5))
            Line((134.5, 123.5), (178.5, 123.5))
        make_face(mode=Mode.SUBTRACT)
    extrude(amount=F23_DEPTH)

    # F24 (on face) → F25 (cut, through all)
    with BuildSketch(Plane.YZ.offset(725)):
        with BuildLine():
            Line((99, 96), (114, 96))
            ThreePointArc((114, 96), (118, 100), (114, 104))
            Line((114, 104), (99, 104))
            ThreePointArc((99, 104), (95, 100), (99, 96))
        make_face()
        with BuildLine():
            ThreePointArc((199, 104), (195, 100), (199, 96))
            Line((199, 96), (214, 96))
            ThreePointArc((214, 96), (218, 100), (214, 104))
            Line((214, 104), (199, 104))
        make_face()
    f25 = extrude(amount=-F25_DEPTH, mode=Mode.SUBTRACT)

    # F25_copies: F25 across plane
    add(f25.mirror(Plane(origin=(377.5, 0, 0), x_dir=(0, 0, -1), z_dir=(-1, 0, 0))), mode=Mode.SUBTRACT)


solid = Compound([f1.part, f10_1.part, f12_1.part, f20_1.part])
